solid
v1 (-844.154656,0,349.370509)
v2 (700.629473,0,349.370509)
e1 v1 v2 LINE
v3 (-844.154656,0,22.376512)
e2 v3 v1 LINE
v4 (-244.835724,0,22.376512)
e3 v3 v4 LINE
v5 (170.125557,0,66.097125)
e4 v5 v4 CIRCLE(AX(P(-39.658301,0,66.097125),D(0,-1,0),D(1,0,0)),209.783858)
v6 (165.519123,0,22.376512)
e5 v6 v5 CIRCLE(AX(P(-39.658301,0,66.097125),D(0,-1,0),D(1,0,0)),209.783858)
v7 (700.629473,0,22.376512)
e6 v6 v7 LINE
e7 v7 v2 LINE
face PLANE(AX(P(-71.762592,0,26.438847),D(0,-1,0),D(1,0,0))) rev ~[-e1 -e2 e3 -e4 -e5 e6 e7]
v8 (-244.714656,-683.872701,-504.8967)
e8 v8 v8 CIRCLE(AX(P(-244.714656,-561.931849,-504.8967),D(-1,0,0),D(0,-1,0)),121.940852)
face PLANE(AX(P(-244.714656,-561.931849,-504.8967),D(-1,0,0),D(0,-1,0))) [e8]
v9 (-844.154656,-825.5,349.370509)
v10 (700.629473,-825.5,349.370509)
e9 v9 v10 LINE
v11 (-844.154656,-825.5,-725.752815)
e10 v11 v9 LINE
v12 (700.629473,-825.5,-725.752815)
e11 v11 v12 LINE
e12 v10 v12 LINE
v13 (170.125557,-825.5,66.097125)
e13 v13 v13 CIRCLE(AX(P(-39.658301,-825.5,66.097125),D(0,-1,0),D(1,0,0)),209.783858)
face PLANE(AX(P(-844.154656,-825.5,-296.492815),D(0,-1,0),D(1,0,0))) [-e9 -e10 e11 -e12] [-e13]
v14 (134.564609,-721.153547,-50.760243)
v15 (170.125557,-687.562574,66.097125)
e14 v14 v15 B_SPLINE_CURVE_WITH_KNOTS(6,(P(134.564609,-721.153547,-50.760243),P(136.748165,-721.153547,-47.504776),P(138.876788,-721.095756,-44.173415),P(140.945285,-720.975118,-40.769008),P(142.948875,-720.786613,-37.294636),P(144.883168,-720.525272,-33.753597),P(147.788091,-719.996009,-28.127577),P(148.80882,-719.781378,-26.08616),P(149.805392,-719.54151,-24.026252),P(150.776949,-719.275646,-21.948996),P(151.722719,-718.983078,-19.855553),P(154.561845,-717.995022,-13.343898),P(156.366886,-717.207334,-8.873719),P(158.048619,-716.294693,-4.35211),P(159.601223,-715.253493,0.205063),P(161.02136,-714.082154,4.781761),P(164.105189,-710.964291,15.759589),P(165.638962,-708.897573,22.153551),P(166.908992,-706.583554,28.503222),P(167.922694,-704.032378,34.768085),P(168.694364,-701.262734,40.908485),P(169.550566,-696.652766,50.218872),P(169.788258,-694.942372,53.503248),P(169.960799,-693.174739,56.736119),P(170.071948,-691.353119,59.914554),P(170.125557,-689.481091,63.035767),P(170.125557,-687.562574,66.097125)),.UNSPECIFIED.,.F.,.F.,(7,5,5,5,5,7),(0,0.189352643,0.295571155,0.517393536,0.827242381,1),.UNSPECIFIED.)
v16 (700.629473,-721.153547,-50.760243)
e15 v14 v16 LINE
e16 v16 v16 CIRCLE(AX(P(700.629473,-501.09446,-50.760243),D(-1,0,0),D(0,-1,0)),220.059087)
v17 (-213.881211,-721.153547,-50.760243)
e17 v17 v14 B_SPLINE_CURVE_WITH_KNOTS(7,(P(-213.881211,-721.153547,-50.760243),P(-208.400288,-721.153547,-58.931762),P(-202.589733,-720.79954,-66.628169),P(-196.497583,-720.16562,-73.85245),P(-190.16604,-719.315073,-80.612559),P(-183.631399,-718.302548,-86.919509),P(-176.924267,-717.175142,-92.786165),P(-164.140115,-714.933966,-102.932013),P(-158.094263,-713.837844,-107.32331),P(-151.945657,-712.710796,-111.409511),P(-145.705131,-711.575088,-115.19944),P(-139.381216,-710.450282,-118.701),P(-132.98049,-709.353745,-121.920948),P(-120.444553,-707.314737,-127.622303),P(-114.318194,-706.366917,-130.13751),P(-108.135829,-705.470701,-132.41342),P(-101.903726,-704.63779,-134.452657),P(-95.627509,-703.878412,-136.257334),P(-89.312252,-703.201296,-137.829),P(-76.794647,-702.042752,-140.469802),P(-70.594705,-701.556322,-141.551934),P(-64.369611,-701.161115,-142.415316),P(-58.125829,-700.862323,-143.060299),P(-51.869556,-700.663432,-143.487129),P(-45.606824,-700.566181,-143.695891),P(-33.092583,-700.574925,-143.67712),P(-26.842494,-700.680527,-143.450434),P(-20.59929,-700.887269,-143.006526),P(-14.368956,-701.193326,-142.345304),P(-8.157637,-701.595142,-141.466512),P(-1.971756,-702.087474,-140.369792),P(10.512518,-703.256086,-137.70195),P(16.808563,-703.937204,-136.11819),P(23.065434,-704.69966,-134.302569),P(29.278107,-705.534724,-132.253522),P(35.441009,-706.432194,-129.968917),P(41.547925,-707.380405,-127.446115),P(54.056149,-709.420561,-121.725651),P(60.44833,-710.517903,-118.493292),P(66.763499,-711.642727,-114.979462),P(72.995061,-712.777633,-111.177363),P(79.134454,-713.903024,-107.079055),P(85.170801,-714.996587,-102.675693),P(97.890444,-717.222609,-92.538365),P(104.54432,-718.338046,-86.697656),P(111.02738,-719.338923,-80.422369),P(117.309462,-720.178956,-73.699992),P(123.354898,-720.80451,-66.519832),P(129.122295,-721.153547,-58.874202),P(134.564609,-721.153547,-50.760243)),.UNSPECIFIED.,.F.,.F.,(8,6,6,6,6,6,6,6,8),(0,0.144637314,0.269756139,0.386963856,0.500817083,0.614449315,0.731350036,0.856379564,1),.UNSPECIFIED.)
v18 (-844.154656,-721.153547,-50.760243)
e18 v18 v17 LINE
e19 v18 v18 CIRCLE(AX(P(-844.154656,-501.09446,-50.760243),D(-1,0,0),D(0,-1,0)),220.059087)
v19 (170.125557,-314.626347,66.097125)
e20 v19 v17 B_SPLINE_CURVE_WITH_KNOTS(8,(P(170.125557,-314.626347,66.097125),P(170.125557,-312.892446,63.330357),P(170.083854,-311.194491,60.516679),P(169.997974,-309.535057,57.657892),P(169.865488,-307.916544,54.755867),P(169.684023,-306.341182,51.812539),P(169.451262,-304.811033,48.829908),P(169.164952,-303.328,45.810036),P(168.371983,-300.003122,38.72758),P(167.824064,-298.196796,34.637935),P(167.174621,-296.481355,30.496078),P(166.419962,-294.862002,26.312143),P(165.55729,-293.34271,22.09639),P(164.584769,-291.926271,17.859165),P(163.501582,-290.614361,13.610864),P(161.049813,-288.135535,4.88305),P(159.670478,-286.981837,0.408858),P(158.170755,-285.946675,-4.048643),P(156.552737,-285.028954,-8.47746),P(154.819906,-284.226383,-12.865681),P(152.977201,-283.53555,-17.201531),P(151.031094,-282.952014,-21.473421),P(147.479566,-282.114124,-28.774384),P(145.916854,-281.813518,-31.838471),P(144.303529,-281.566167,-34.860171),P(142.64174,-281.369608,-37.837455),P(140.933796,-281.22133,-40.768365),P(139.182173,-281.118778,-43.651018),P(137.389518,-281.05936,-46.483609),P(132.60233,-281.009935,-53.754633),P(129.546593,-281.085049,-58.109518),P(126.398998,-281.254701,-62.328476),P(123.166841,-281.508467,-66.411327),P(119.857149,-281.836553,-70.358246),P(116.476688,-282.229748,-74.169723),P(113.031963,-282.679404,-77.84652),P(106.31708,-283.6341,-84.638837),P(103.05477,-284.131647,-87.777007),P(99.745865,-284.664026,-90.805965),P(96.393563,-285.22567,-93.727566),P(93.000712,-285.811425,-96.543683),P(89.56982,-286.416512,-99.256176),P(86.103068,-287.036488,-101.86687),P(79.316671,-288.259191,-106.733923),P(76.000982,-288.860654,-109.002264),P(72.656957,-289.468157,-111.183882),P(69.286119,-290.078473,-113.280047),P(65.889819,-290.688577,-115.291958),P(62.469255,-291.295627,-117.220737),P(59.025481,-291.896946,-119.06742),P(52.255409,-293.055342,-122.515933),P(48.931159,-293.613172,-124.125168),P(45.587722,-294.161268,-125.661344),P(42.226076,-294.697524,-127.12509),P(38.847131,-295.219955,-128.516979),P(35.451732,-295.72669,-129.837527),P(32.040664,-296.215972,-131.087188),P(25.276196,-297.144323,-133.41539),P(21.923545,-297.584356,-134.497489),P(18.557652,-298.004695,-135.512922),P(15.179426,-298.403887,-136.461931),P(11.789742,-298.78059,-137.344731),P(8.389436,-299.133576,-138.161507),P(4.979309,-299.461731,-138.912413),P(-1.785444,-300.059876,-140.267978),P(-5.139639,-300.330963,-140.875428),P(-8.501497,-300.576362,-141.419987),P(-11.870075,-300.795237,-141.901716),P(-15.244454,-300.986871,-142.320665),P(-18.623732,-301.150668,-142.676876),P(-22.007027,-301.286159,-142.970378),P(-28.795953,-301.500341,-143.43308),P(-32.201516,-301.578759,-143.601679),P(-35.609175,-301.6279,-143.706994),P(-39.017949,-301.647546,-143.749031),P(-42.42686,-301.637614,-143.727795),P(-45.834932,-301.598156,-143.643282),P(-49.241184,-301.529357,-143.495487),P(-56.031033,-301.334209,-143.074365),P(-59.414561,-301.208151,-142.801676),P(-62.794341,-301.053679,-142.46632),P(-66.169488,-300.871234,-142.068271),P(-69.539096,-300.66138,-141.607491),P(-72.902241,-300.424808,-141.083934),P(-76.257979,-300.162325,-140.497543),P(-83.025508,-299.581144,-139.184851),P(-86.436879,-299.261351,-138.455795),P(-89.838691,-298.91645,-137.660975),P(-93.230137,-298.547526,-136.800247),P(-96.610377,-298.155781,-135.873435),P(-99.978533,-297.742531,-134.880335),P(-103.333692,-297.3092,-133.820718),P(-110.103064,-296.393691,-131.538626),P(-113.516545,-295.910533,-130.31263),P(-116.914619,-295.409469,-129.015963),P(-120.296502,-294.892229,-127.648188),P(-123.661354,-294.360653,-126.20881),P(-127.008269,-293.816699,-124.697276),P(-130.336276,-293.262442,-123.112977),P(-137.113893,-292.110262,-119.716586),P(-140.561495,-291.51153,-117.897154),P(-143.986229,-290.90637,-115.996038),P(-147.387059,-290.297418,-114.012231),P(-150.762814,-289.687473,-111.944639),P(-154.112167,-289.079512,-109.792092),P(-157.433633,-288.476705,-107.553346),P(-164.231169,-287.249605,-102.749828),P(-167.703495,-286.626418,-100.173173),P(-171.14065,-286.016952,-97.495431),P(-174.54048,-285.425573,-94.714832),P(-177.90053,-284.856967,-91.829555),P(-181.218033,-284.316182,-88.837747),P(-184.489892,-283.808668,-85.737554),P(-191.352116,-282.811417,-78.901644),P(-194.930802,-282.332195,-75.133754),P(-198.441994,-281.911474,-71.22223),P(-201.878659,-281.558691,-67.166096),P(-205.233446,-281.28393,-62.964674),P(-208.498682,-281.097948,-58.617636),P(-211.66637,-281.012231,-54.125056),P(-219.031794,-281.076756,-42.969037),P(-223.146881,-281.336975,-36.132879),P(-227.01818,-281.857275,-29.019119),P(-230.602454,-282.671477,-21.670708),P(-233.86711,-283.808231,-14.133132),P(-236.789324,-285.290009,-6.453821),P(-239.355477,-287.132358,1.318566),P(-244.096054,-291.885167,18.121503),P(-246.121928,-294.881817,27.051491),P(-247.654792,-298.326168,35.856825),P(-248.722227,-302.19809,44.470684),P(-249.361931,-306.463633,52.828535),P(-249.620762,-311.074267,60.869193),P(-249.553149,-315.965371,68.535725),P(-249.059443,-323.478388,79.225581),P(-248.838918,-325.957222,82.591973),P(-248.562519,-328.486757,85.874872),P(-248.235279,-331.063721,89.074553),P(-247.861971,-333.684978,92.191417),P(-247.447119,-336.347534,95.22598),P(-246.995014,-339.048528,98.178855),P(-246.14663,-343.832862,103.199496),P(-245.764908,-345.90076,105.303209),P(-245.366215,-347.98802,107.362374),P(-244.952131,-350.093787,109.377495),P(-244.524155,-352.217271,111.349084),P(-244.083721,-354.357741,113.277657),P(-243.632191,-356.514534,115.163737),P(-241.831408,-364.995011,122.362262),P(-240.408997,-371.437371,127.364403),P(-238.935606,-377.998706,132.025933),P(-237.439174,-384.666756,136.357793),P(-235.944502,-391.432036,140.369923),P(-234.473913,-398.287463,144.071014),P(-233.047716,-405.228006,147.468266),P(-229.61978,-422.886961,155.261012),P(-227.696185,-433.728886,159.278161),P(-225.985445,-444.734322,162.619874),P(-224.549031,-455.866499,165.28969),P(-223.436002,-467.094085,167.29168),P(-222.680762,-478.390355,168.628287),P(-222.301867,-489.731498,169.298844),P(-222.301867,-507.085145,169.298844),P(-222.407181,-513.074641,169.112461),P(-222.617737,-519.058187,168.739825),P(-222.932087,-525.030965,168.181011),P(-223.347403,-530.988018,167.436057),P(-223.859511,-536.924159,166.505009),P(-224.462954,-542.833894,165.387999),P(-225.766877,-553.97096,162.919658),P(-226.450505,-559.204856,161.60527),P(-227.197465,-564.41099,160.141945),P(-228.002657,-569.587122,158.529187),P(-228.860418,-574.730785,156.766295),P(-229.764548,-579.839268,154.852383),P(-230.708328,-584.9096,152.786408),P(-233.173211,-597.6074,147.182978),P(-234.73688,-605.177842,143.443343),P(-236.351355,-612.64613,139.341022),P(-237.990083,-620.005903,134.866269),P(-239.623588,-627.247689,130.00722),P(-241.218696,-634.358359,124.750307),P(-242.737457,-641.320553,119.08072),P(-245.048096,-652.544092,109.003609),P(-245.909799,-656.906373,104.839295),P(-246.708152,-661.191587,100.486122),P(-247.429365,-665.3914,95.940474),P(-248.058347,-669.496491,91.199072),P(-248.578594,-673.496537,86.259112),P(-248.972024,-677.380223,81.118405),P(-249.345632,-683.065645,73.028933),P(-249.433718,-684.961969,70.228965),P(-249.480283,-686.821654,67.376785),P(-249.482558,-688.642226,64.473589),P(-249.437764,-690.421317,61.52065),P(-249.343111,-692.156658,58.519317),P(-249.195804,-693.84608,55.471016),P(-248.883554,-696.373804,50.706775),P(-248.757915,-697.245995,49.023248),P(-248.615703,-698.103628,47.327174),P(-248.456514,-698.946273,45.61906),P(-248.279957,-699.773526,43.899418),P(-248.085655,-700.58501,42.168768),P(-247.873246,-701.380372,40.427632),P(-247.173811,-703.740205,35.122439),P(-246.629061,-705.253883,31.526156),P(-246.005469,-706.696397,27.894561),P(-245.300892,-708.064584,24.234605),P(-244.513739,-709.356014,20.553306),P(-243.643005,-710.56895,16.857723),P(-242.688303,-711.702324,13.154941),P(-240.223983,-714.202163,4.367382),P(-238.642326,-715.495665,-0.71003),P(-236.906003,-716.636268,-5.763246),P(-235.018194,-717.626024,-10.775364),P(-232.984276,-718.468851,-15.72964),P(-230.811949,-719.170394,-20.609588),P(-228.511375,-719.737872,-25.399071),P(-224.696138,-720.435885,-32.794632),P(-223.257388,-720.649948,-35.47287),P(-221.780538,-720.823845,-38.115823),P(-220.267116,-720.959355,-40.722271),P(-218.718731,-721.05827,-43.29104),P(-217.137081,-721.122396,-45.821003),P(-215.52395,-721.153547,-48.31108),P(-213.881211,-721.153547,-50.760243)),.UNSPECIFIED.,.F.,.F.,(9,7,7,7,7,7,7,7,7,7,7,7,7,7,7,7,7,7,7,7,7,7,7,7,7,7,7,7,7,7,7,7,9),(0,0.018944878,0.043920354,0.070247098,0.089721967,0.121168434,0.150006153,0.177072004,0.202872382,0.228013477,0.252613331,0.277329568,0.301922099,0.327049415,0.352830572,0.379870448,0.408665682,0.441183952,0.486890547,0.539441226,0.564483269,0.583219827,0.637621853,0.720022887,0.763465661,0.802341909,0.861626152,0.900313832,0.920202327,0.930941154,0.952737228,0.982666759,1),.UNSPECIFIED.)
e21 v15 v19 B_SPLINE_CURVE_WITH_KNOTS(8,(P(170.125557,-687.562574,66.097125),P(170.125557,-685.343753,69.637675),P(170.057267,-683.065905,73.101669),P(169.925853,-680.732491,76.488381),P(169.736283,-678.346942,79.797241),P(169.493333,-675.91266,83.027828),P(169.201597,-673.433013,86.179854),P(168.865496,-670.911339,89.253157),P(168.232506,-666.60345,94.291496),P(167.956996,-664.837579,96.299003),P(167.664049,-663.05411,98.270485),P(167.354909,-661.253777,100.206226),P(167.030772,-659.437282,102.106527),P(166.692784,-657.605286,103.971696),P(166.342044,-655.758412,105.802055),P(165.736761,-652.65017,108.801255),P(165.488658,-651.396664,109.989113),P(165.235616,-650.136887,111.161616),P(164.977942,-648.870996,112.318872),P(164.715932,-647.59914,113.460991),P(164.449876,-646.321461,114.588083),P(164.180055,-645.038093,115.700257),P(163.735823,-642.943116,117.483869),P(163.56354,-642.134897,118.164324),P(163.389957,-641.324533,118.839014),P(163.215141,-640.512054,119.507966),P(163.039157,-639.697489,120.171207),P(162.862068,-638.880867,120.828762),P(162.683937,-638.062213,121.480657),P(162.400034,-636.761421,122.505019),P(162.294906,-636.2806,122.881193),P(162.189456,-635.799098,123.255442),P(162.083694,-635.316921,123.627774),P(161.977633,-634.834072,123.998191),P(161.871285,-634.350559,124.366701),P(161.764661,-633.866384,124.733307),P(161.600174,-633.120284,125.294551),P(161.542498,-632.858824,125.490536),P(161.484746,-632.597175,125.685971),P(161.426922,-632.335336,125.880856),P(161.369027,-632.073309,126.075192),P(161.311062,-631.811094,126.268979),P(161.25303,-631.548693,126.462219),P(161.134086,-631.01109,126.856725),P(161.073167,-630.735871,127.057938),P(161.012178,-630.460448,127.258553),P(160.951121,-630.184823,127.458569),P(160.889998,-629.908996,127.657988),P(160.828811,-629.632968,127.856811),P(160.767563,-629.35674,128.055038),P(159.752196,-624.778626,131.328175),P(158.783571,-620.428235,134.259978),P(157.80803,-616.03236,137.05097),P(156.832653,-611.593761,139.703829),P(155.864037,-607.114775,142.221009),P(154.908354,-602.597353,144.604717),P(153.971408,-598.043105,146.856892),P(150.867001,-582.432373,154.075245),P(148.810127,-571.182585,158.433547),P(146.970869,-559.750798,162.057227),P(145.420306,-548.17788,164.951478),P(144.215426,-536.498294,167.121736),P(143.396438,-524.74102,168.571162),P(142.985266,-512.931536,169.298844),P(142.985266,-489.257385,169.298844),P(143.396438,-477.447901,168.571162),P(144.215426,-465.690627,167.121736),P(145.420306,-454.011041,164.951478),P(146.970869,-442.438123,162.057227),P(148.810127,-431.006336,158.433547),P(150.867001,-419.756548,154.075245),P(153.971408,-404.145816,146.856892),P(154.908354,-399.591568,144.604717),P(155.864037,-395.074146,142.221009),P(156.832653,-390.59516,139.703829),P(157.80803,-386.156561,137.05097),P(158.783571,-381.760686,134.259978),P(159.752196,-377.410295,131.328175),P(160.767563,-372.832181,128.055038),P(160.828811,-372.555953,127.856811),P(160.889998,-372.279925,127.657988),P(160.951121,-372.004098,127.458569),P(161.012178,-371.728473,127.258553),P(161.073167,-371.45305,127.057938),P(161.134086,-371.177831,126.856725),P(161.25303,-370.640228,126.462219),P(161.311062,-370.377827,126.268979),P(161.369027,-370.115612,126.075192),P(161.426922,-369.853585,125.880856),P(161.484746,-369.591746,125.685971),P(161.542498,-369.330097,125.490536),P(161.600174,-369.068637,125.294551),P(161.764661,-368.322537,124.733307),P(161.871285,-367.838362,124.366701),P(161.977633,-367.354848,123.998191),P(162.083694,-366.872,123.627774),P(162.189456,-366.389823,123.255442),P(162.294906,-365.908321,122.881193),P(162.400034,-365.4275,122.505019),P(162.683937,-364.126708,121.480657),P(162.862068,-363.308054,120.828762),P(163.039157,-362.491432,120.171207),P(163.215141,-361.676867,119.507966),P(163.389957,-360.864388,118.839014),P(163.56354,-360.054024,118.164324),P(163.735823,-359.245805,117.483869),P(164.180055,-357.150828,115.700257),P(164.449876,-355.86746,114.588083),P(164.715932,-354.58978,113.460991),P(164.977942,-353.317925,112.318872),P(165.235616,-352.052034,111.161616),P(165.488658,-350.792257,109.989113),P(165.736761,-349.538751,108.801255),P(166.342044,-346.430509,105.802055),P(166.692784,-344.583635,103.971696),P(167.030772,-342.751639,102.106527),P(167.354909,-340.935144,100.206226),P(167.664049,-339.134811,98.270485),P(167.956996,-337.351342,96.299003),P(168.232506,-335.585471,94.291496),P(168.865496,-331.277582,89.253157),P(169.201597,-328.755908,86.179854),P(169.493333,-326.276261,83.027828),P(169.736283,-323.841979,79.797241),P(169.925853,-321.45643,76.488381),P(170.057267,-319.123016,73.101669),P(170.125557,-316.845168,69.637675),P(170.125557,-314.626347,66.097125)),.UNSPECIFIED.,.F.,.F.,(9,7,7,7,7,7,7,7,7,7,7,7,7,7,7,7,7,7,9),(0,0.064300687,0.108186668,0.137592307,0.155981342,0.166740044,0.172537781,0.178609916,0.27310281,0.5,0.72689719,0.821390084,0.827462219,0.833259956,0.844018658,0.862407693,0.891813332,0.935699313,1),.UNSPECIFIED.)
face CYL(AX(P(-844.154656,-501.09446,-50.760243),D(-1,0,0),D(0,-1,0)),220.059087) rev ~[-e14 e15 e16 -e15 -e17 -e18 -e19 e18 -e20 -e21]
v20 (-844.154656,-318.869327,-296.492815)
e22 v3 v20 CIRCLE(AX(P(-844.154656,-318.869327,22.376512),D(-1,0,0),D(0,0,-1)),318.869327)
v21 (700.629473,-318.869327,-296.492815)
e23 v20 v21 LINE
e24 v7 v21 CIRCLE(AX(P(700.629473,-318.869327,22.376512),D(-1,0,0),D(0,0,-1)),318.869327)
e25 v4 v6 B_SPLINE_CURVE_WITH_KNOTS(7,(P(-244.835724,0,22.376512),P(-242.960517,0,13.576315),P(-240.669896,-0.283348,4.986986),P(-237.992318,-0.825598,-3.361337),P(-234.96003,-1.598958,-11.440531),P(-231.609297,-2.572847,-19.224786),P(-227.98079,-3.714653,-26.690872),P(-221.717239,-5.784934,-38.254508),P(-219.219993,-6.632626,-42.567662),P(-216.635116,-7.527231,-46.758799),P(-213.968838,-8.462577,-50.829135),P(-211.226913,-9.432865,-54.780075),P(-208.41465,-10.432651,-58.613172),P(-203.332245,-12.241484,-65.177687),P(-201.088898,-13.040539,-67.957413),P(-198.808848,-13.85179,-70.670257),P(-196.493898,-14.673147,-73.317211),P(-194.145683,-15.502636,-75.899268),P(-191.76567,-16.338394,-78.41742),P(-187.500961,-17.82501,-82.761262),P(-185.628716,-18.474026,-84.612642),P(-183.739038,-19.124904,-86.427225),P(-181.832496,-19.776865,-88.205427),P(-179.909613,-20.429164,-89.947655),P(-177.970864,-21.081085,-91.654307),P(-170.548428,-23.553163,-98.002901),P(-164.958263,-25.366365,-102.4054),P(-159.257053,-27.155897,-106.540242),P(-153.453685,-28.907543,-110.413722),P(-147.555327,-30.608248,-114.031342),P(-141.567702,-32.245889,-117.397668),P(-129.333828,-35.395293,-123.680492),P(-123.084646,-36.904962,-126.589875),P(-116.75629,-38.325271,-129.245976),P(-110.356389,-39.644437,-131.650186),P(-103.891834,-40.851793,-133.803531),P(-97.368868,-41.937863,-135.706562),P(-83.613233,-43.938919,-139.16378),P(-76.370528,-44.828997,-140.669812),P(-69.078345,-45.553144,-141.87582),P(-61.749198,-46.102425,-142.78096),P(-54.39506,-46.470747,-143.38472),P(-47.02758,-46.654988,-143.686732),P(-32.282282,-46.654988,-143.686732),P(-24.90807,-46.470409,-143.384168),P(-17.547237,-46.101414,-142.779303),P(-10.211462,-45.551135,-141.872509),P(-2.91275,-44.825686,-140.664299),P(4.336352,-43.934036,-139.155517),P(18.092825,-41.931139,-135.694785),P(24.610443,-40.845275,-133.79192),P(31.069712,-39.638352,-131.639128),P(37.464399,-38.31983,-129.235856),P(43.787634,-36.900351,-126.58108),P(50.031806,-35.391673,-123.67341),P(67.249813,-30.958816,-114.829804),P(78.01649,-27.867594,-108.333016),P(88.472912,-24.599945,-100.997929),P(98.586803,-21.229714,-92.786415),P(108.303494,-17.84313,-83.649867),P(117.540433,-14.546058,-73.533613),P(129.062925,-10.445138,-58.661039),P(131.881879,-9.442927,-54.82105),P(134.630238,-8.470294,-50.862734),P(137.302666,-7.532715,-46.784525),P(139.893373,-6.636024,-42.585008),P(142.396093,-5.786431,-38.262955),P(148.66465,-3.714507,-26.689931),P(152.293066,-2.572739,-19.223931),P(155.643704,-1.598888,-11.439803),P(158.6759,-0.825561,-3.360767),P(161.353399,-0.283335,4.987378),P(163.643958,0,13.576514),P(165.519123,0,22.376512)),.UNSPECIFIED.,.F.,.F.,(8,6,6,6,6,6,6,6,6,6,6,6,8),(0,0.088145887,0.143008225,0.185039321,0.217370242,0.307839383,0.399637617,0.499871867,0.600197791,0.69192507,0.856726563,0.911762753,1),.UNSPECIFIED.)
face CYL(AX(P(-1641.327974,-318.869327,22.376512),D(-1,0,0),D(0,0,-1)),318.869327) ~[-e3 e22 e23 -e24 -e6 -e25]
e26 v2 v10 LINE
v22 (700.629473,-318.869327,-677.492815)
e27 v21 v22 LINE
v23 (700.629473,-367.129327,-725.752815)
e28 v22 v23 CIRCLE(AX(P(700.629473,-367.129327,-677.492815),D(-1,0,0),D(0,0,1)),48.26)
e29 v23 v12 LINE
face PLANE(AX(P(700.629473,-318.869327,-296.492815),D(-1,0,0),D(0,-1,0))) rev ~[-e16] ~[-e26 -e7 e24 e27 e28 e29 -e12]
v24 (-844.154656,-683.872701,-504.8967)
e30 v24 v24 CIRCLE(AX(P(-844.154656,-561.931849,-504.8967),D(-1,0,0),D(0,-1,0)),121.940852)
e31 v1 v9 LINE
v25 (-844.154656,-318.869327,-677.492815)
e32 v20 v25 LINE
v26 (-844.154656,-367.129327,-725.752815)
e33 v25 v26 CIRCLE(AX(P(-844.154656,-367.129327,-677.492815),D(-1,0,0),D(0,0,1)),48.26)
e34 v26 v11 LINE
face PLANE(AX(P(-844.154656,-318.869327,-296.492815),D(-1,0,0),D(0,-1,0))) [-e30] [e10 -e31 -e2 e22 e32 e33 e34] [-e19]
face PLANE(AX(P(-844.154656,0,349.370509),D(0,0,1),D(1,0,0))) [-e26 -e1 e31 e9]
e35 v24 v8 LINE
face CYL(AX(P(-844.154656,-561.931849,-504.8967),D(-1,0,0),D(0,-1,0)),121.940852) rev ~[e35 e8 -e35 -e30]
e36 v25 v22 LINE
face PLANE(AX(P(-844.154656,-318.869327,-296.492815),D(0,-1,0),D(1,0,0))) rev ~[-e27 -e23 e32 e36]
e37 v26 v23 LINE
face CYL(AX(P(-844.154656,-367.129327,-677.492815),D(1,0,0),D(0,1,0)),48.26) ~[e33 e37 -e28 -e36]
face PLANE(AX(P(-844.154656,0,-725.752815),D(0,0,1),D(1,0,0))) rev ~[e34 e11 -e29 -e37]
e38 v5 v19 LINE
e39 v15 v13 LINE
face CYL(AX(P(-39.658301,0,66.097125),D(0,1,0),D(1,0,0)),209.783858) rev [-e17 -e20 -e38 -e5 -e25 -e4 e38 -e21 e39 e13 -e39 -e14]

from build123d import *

# Parameters (mm, degrees)
F0_W        = 1544.7841286659
F0_H        = 645.8633244038
F0_R        = 209.7838577095
F1_DEPTH    = 825.5
F2_T1_DEPTH = 3139.1307652571
F3_DEPTH    = 429.26
F4_R        = 220.0590869867
F5_DEPTH    = 1765.3
F6_R        = 48.26
F4_R_2      = 121.9408524026
F7_DEPTH    = 599.44


# Not quite as in the source:
# - a fillet or chamfer that OpenCascade refuses, or shapes differently, is made with other operations: its cross-section is extruded or revolved along the edge and cut away or added


with BuildPart() as f1:
    # F0 (on Front) → F1 (new body)
    with BuildSketch(Plane.XZ):
        with Locations((-71.7625916004, 26.4388471842)):
            Rectangle(F0_W, F0_H)
        with Locations((-39.6583005786, 66.097125411)):
            Circle(F0_R, mode=Mode.SUBTRACT)
    extrude(amount=F1_DEPTH)

    # F2: fillet of radius 318.8693273182 on 1 edges, made by hand

    # F2_s2 → F2_t1 (cut)
    with BuildSketch(Plane.YZ.offset(-1641.327974229)):
        with BuildLine():
            ThreePointArc((-318.8693273182, -296.4928150177), (-93.3946636591, -203.0981513586), (0, 22.3765123005))
            Line((0, 22.3765123005), (0, -296.4928150177))
            Line((0, -296.4928150177), (-318.8693273182, -296.4928150177))
        make_face()
    extrude(amount=F2_T1_DEPTH, mode=Mode.SUBTRACT)

    # F3 (add): a face of the model
    f3_faces = [f1.faces().sort_by_distance(p)[0] for p in [
        (-71.7625916004, -572.1846636591, -296.4928150177),
    ]]
    extrude(f3_faces, amount=F3_DEPTH)

    # F4 (on face) → F5 (cut)
    with BuildSketch(Plane(origin=(-844.1546559334, 0, 0), x_dir=(0, -1, 0), z_dir=(-1, 0, 0))):
        with Locations((501.0944604874, -50.760243088)):
            Circle(F4_R)
    extrude(amount=-F5_DEPTH, mode=Mode.SUBTRACT)

    # F6
    f6_edges = [f1.edges().sort_by_distance(p)[0] for p in [
        (-71.762592, -318.869327, -725.752815),
    ]]
    fillet(f6_edges, radius=F6_R)

    # F4 (on face) → F7 (cut)
    with BuildSketch(Plane(origin=(-844.1546559334, 0, 0), x_dir=(0, -1, 0), z_dir=(-1, 0, 0))):
        with Locations((561.931848526, -504.8967003822)):
            Circle(F4_R_2)
    extrude(amount=-F7_DEPTH, mode=Mode.SUBTRACT)


solid = f1.part
